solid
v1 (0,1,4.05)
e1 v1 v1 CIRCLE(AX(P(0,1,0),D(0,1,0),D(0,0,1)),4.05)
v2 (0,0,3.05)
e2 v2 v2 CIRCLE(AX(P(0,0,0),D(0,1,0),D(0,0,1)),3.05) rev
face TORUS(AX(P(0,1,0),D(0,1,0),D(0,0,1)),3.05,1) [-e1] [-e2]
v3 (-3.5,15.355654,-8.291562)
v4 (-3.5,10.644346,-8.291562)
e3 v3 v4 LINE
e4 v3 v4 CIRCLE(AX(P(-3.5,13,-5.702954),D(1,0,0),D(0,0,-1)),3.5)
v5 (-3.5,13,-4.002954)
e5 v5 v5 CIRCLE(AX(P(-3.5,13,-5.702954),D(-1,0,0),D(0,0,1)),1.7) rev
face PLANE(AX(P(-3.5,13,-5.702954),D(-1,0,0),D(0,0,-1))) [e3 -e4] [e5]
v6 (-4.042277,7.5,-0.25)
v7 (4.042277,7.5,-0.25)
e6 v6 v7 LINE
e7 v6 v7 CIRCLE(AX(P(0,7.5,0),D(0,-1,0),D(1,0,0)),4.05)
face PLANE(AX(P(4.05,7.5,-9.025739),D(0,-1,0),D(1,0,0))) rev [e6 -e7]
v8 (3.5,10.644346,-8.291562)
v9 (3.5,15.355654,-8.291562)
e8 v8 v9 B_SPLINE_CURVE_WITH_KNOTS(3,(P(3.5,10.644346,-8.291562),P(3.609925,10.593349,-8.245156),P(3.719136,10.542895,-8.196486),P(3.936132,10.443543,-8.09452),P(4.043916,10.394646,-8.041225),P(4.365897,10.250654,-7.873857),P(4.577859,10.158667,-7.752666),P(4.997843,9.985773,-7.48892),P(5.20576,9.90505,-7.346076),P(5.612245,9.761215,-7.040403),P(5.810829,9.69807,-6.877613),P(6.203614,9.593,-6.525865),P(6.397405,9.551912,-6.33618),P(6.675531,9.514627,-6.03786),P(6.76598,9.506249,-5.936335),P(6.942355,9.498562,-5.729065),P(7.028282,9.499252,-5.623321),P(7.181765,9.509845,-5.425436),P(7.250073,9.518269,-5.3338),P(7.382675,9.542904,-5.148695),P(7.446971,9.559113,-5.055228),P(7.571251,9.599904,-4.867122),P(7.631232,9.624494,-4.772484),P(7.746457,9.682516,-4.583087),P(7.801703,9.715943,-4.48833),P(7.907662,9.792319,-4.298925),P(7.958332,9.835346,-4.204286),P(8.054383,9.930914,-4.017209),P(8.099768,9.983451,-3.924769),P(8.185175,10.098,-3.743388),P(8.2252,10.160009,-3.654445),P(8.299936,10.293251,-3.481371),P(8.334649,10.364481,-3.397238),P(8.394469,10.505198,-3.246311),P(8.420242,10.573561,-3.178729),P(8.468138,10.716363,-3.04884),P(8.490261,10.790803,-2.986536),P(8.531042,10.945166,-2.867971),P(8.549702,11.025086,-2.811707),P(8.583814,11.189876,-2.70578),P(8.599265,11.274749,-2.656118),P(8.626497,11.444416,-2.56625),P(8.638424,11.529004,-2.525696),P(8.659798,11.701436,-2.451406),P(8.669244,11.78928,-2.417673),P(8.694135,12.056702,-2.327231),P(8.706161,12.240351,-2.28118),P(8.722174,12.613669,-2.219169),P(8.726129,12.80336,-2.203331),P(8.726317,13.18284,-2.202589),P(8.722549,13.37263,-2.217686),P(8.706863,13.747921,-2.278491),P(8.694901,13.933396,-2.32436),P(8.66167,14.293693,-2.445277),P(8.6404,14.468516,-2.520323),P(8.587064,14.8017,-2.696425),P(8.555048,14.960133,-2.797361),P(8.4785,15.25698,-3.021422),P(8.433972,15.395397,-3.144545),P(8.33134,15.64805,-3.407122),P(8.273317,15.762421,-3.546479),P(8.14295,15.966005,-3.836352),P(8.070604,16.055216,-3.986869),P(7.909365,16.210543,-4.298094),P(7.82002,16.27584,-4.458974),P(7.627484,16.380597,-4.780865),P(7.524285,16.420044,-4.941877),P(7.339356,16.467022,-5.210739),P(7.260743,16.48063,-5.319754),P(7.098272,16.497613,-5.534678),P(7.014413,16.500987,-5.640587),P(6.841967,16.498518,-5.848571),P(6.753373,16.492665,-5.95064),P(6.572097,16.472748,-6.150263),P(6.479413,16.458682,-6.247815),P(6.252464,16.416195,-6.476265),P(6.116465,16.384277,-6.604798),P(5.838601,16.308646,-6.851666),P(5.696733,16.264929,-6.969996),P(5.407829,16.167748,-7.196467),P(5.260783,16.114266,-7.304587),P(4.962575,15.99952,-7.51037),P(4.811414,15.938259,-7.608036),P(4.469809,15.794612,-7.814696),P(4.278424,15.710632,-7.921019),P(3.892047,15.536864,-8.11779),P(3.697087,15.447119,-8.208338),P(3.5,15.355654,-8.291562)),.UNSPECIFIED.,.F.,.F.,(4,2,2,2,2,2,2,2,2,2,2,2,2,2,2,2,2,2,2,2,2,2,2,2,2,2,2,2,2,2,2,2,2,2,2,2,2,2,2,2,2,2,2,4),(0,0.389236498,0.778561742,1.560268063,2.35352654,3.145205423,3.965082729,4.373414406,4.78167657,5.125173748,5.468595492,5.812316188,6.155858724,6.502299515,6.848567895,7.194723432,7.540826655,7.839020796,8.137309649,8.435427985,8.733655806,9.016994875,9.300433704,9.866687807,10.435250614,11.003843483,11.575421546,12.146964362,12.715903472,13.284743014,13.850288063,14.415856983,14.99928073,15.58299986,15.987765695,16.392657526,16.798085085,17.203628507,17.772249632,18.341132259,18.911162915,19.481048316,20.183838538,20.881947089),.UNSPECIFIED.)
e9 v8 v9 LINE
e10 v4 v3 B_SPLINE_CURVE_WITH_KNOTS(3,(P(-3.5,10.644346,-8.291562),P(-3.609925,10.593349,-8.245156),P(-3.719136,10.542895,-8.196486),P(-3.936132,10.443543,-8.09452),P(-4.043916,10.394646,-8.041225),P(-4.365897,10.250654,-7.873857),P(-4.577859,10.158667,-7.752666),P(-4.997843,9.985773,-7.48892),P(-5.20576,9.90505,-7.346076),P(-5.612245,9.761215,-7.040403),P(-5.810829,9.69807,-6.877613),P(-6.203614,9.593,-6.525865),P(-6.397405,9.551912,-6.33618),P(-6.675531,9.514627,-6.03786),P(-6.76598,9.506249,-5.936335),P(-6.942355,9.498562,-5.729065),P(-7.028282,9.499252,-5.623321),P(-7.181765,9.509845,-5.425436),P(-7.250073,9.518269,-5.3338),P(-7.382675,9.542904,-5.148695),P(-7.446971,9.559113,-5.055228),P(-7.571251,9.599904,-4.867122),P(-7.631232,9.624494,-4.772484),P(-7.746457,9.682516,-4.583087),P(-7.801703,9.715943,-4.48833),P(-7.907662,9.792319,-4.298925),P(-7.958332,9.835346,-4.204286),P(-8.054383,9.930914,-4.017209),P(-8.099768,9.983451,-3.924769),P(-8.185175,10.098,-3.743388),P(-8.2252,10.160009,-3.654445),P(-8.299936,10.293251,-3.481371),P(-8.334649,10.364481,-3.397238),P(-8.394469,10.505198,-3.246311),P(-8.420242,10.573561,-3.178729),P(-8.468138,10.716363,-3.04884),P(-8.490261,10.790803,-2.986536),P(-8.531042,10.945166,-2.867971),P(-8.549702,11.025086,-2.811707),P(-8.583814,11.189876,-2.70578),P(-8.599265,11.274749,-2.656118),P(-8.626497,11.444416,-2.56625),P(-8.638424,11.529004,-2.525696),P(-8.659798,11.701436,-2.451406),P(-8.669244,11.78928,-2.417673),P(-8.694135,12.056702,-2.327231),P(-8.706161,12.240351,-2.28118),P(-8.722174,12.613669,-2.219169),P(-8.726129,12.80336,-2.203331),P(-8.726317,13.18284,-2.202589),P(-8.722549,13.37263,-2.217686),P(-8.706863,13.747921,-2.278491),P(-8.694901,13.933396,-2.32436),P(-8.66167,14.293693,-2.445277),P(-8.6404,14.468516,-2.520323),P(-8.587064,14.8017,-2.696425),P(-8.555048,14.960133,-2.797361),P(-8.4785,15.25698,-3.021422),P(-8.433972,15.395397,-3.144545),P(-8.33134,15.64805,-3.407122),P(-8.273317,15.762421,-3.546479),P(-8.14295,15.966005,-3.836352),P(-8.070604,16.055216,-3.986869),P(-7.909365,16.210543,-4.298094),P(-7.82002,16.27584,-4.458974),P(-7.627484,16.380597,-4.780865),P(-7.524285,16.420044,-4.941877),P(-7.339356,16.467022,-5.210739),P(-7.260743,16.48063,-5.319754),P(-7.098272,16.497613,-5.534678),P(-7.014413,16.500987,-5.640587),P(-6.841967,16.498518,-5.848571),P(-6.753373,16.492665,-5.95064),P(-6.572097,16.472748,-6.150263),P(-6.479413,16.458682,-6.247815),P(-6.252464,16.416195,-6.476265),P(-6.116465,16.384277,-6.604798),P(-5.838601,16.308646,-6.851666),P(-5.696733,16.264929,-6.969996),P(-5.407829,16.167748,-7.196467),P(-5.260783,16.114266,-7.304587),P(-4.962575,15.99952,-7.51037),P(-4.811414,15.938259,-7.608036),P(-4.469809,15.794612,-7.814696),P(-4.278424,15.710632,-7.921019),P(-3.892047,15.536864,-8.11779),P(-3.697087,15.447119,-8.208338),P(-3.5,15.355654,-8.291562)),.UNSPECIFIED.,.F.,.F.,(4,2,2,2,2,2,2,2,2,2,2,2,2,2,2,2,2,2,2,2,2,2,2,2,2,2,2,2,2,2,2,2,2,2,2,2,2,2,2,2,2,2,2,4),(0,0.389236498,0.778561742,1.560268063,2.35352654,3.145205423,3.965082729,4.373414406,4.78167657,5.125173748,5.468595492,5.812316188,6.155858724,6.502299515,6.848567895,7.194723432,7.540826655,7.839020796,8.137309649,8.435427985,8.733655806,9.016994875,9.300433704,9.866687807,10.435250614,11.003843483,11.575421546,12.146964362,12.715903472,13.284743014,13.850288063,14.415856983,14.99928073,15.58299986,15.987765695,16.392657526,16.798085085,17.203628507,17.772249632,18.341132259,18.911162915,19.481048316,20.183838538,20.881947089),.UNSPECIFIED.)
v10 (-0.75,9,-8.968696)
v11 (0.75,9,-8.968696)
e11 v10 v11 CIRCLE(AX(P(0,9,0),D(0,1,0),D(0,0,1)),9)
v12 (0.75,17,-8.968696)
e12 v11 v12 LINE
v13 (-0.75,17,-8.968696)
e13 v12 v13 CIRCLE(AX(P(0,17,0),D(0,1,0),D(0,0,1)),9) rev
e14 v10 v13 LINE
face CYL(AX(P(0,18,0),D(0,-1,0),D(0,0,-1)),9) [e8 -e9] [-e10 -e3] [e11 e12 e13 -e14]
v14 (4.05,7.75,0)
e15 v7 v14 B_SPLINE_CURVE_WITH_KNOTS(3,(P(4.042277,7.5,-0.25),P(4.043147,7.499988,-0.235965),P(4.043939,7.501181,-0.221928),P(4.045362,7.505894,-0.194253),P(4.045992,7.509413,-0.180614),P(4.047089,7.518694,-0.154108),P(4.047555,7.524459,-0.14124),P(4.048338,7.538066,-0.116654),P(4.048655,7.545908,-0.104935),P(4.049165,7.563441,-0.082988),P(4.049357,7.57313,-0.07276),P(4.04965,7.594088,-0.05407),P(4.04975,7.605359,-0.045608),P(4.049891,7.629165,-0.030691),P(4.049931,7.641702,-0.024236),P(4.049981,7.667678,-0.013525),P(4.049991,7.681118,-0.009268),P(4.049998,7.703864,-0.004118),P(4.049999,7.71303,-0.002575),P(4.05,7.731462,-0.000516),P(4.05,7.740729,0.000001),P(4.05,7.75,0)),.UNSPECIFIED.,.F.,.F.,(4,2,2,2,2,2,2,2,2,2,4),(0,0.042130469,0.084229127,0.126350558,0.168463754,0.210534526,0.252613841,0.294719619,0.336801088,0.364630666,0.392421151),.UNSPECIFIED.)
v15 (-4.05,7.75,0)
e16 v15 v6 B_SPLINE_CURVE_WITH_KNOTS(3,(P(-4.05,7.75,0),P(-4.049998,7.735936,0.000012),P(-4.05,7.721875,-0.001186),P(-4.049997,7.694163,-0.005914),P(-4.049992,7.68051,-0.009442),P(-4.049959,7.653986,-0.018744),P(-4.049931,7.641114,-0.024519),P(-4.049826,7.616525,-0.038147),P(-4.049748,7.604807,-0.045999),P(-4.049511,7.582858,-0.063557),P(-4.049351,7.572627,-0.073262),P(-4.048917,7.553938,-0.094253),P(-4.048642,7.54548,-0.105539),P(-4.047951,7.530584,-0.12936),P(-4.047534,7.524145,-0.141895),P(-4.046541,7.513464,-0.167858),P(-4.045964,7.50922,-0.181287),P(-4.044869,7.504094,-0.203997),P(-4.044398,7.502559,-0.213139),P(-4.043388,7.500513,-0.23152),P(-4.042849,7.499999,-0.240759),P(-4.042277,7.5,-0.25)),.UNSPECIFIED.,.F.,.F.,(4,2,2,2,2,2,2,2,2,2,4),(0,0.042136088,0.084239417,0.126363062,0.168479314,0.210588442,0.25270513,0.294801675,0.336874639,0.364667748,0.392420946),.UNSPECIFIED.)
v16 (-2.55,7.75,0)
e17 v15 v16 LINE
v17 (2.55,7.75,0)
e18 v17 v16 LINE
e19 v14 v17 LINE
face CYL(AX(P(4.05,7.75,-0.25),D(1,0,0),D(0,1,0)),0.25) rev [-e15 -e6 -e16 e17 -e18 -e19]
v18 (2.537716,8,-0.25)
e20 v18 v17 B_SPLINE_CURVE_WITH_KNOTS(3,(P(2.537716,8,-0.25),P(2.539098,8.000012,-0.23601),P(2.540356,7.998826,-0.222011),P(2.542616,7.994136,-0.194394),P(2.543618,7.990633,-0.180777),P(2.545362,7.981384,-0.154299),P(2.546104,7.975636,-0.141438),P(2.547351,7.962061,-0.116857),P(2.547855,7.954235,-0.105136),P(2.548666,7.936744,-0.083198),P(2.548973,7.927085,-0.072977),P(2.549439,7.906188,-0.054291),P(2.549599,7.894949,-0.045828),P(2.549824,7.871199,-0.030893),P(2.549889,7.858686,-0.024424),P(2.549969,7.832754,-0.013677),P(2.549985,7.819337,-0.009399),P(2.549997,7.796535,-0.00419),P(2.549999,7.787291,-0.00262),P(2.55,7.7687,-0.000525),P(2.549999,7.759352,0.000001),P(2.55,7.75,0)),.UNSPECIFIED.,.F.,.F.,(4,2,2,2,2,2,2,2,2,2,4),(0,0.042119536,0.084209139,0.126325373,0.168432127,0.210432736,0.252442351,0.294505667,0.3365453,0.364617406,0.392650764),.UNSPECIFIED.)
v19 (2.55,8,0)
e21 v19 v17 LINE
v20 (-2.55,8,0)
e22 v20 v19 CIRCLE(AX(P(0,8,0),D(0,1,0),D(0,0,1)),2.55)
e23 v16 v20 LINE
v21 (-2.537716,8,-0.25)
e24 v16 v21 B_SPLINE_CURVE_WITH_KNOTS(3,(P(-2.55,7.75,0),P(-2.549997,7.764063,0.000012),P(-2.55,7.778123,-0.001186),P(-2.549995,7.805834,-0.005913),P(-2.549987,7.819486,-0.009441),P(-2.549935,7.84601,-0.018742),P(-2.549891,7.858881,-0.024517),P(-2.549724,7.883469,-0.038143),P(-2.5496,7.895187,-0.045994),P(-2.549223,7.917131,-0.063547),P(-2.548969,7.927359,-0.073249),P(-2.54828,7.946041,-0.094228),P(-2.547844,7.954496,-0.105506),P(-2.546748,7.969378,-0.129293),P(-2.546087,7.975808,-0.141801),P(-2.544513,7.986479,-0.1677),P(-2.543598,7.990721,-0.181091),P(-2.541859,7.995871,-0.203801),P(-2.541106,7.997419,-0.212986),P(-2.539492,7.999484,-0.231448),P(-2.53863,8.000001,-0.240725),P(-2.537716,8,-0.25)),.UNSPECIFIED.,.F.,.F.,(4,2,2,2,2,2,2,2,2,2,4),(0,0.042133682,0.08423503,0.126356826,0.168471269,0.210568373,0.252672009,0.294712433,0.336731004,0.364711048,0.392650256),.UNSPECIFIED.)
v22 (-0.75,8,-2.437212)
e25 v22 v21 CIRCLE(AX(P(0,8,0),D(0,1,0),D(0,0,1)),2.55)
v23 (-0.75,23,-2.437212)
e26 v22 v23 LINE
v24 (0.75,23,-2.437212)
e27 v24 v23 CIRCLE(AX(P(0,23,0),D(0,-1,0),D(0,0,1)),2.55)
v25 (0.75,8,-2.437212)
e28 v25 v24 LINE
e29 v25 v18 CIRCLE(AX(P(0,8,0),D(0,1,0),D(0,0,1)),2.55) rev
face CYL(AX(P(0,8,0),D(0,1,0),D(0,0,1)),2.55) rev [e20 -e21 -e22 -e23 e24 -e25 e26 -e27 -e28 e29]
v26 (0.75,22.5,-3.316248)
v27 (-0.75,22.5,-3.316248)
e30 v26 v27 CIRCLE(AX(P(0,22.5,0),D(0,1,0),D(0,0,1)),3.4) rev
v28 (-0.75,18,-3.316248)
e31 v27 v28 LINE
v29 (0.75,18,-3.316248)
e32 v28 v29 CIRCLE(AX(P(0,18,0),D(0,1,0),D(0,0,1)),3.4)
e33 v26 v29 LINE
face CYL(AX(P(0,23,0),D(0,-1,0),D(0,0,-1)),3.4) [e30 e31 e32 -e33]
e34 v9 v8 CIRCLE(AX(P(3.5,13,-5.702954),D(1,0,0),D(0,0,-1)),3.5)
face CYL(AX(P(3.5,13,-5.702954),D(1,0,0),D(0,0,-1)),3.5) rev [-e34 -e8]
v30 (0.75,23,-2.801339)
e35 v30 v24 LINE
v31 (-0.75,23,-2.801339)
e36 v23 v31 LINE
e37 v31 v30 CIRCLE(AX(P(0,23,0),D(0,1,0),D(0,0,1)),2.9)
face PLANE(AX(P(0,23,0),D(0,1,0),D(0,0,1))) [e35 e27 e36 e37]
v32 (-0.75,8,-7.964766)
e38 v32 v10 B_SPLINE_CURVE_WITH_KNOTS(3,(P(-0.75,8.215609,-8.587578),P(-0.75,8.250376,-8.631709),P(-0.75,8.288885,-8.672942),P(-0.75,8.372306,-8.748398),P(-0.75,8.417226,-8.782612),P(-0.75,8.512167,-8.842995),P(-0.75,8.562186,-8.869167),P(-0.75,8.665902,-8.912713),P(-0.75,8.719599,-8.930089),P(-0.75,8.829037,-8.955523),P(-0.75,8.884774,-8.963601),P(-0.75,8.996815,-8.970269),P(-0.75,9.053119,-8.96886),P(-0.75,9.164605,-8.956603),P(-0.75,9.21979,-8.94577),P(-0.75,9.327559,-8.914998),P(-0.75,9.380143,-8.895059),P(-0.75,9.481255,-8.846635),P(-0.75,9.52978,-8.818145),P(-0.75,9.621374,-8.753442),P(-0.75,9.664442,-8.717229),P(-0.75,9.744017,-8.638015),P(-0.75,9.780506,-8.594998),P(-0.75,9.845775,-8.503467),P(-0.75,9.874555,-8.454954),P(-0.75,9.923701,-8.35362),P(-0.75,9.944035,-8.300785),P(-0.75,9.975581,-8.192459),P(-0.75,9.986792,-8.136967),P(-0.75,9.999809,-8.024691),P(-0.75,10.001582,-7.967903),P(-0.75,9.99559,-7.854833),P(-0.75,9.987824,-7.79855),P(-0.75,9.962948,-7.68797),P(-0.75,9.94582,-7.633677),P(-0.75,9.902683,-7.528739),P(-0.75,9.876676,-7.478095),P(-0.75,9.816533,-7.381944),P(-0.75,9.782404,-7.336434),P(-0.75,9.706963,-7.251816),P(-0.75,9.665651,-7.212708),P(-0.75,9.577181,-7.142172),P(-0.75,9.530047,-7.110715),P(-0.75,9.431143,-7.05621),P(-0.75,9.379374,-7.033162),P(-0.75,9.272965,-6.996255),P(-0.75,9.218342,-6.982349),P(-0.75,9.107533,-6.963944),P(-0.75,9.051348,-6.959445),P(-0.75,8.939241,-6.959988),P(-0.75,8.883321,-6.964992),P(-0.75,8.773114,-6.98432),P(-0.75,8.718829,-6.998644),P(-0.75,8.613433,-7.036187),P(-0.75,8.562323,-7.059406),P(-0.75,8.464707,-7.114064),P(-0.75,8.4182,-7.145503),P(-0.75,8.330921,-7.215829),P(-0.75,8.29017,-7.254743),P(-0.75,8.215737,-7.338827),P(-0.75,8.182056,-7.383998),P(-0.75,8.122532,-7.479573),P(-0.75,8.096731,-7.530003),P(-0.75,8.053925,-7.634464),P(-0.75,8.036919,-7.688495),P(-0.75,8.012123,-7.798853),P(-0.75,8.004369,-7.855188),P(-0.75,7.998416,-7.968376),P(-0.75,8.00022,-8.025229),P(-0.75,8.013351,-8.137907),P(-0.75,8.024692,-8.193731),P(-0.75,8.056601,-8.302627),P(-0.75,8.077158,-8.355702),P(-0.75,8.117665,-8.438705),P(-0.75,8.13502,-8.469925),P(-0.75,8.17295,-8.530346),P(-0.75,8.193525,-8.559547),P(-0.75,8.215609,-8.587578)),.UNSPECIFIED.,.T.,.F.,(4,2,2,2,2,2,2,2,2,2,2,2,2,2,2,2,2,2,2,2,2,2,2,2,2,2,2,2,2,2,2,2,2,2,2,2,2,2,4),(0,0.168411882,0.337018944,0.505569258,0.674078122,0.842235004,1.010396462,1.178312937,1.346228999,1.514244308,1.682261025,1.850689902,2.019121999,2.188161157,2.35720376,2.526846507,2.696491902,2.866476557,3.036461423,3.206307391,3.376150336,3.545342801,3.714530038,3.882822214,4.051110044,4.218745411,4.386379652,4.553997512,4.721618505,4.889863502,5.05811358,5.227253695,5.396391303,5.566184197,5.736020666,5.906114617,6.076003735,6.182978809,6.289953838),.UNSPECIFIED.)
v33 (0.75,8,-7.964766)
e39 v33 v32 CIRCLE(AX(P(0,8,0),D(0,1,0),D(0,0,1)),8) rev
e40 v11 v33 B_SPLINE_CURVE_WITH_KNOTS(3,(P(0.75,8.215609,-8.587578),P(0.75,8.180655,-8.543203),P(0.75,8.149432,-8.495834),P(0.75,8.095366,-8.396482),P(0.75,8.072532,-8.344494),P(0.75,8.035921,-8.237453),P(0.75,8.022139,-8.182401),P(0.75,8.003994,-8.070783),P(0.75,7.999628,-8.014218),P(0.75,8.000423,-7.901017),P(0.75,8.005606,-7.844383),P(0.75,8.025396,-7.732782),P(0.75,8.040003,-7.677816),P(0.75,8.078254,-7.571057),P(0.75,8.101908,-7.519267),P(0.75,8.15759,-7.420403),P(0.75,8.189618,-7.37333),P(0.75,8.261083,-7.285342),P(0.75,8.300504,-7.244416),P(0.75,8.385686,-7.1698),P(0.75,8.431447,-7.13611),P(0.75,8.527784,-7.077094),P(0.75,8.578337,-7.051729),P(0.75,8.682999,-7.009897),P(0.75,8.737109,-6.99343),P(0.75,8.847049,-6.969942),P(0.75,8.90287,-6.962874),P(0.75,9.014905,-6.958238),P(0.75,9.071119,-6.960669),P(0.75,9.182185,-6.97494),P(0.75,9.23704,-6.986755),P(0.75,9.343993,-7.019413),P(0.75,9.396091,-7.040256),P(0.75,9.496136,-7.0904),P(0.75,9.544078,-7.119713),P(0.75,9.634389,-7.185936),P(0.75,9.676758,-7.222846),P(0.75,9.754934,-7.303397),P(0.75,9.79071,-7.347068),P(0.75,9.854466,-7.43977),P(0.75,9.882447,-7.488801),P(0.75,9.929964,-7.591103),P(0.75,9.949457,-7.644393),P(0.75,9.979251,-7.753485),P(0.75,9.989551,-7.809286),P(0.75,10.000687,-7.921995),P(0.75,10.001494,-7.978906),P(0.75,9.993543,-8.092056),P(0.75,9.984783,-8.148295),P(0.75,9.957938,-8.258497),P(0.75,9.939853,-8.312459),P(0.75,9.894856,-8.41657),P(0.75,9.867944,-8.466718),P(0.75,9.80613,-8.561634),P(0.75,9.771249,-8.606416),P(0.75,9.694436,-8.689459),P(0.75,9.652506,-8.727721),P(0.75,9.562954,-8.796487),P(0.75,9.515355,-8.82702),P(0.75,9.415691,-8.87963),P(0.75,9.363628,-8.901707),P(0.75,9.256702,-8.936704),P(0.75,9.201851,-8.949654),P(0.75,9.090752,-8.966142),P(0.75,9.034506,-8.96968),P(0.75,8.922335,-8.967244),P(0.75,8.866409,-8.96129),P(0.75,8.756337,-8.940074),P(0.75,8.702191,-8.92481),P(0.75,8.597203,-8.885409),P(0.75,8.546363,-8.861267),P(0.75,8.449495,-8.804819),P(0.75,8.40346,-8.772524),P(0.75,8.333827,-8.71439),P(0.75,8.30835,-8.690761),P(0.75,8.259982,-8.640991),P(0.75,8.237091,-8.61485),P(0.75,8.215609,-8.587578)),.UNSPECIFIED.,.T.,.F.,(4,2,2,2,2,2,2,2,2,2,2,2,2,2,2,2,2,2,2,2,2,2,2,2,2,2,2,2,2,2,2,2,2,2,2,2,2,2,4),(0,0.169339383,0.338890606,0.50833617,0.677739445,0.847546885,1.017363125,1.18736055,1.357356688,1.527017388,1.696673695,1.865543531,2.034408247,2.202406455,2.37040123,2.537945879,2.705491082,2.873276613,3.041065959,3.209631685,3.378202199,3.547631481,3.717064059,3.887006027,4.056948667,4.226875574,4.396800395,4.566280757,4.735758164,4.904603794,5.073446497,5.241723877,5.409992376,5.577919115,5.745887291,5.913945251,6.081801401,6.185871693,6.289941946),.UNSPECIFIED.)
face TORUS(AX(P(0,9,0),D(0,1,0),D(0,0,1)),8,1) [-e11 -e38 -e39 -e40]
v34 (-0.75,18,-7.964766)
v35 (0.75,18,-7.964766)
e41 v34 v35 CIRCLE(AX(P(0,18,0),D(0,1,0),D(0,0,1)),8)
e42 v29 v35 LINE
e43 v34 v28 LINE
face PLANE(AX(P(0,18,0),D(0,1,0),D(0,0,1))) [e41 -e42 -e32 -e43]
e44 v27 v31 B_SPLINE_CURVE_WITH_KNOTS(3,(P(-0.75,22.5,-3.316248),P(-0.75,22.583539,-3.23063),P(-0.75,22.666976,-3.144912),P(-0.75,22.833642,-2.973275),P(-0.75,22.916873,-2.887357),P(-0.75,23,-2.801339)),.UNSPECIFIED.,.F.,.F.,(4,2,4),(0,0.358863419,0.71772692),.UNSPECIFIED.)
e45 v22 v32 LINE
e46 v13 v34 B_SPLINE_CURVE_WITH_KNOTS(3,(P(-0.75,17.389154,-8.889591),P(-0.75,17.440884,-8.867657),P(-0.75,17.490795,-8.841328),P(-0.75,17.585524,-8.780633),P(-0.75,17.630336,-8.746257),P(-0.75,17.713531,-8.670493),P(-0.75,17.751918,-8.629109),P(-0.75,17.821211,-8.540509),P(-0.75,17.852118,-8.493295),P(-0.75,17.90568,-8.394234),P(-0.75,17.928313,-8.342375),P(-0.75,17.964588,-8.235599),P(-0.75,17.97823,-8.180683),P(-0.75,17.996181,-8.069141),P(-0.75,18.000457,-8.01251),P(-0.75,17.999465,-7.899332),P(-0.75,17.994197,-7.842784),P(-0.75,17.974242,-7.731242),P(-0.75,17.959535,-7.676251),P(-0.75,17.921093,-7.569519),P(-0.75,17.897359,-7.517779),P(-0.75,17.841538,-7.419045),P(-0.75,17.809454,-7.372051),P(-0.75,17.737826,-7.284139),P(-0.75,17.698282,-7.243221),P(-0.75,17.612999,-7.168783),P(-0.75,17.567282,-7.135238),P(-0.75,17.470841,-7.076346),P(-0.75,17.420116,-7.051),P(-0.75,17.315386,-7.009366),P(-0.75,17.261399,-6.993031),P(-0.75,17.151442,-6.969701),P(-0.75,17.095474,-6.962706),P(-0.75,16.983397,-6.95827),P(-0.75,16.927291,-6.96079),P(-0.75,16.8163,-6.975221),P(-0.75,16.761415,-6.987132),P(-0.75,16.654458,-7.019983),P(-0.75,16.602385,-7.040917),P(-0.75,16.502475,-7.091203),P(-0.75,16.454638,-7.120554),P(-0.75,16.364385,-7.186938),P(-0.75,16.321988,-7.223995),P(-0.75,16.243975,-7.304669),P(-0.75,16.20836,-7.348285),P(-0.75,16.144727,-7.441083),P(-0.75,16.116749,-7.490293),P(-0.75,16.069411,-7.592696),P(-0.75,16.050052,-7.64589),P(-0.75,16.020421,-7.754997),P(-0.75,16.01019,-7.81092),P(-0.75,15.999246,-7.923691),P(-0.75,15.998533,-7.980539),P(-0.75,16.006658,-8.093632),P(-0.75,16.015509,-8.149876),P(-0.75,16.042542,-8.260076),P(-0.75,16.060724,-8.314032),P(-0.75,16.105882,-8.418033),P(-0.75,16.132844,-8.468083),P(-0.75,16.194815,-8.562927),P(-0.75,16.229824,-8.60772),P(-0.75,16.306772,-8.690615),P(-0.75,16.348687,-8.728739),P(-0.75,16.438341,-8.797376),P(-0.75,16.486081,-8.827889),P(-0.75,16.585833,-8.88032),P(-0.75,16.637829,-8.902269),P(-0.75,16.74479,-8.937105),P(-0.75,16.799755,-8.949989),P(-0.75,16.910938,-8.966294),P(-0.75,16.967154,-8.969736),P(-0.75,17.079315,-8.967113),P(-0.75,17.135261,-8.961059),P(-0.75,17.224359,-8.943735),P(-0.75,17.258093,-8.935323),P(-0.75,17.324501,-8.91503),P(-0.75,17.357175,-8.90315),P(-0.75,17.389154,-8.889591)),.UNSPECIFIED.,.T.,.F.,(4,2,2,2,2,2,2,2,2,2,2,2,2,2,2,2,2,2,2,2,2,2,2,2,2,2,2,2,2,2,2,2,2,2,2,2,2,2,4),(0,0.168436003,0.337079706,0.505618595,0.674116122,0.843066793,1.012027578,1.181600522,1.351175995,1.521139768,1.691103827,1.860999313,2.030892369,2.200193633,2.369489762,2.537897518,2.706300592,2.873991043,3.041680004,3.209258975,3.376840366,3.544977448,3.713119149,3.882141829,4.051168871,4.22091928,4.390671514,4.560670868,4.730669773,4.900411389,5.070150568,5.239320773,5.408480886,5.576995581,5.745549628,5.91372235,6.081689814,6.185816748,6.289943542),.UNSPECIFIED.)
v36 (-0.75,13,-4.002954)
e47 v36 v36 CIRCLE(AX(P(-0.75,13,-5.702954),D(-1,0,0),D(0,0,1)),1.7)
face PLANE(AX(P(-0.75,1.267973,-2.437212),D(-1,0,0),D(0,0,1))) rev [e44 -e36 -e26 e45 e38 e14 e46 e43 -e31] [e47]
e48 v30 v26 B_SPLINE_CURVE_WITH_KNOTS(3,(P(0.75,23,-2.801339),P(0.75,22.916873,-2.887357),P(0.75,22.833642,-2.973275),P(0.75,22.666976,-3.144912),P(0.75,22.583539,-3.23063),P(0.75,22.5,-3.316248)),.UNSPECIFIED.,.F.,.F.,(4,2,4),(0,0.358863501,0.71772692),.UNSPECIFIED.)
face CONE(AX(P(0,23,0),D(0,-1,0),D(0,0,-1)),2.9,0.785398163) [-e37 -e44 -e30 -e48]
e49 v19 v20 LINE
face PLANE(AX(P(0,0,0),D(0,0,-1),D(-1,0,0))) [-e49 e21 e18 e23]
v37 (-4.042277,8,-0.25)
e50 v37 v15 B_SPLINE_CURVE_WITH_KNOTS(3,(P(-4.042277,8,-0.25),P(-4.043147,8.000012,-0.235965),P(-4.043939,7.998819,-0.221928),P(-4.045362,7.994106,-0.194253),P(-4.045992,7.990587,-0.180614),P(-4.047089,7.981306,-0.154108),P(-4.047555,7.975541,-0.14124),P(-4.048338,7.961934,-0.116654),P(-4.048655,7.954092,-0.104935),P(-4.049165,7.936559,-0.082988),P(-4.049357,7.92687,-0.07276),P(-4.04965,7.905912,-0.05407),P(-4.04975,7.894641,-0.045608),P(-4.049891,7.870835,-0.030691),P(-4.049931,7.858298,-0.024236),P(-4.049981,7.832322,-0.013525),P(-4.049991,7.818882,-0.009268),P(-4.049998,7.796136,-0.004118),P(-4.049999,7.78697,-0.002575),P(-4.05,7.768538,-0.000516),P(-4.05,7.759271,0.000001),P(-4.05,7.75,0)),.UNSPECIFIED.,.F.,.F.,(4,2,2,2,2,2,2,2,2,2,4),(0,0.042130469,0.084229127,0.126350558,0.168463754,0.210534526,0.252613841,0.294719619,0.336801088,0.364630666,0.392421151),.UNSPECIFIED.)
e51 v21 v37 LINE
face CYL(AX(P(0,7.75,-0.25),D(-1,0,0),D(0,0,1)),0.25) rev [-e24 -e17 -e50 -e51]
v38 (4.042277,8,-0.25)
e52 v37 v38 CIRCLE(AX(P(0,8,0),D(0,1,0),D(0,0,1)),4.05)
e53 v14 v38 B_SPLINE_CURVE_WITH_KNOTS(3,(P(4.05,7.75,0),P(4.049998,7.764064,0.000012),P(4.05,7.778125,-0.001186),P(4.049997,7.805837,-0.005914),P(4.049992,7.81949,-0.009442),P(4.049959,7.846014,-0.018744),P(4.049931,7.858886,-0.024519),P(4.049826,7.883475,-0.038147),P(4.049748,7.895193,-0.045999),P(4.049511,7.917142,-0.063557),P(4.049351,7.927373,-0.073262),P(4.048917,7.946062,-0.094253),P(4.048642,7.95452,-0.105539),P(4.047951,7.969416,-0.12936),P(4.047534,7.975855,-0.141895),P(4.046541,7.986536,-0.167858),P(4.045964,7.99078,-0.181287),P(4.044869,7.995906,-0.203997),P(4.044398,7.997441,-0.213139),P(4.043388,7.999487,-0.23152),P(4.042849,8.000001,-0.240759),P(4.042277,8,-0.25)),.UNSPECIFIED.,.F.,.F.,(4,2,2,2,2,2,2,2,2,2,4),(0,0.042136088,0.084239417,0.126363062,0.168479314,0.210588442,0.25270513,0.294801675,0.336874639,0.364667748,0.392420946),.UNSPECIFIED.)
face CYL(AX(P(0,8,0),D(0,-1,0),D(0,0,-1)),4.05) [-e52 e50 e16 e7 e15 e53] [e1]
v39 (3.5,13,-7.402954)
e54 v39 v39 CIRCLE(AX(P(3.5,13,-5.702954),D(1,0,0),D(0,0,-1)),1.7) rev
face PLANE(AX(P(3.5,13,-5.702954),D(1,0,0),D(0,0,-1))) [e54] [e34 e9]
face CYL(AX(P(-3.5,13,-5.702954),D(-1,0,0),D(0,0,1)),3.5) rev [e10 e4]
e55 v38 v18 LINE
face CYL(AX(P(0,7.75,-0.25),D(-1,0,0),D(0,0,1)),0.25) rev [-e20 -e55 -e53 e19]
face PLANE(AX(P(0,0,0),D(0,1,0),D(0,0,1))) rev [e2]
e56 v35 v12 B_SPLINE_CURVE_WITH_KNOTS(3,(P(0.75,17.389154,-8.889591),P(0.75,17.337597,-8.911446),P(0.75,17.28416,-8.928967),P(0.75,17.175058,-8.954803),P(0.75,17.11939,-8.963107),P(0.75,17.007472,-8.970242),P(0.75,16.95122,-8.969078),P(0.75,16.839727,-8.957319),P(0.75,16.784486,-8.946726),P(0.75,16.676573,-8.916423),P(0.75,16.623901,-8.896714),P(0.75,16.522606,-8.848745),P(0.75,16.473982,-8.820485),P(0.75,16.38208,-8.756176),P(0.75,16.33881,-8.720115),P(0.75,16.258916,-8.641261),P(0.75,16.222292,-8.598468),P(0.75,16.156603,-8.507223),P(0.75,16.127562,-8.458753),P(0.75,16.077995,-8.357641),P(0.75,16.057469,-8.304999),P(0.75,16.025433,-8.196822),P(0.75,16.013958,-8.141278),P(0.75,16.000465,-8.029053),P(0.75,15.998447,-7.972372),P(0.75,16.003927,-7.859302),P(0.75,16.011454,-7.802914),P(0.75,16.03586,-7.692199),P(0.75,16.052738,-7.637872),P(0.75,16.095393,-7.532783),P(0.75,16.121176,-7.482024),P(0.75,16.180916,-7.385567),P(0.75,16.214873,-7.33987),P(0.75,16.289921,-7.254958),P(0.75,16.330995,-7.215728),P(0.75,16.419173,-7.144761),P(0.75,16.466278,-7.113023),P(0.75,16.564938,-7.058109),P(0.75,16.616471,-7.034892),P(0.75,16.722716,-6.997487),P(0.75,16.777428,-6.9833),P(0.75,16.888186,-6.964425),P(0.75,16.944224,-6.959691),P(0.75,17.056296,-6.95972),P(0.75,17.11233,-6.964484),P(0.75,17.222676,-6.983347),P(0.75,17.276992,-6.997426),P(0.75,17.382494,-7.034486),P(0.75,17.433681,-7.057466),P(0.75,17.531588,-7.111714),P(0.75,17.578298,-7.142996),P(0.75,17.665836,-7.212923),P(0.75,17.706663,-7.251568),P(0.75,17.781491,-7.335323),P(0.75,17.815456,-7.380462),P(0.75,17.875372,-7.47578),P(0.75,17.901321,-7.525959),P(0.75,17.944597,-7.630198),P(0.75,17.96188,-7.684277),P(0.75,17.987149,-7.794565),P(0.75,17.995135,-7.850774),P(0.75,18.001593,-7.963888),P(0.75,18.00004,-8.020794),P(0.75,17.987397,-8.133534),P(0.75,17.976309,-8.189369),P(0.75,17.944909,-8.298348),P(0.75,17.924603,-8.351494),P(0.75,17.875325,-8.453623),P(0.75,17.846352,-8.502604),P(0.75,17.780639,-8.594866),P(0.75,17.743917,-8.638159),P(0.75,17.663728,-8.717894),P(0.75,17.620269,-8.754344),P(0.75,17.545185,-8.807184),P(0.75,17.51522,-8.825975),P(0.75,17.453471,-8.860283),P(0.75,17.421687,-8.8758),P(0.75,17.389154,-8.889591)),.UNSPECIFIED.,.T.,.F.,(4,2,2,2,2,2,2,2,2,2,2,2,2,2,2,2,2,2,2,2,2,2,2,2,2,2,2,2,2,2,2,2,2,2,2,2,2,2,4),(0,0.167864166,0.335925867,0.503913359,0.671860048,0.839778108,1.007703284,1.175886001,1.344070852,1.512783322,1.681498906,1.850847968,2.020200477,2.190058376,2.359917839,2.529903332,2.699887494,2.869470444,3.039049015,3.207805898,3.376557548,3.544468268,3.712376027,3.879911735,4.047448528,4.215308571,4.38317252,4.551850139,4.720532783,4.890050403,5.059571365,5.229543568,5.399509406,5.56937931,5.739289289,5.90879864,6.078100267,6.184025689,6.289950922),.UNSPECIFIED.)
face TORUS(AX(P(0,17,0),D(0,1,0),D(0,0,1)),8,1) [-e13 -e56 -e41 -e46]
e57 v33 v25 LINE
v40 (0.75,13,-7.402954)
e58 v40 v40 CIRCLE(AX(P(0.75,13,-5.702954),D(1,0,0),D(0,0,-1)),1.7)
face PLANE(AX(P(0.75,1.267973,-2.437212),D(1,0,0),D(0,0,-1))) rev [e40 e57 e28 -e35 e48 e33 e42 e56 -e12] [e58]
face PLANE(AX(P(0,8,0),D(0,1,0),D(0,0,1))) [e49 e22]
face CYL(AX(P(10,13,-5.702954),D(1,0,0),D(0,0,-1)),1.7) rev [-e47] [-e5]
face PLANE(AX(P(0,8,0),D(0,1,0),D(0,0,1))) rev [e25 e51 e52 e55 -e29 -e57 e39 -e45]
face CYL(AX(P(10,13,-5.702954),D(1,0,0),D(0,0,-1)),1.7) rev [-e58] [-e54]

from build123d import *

# Parameters (mm, degrees)
SKETCH1_R            = 4.05
BOSS_EXTRUDE1_DEPTH  = 8
SKETCH2_R            = 9
BOSS_EXTRUDE2_DEPTH  = 10
FILLET1_R            = 1
SKETCH3_R            = 2.55
CUT_EXTRUDE1_DEPTH   = 10
CUT_EXTRUDE2_REACH   = 24.045
M3_CLEARANCE_HOLE1_D = 3.4
SKETCH28_R           = 3.5
CUT_EXTRUDE3_DEPTH   = 6.5
SKETCH29_W           = 8.1
SKETCH29_H           = 0.5
CUT_EXTRUDE7_DEPTH   = 23.045407848
FILLET2_R            = 0.25
BOSS_EXTRUDE3_START  = 5
BOSS_EXTRUDE3_DEPTH  = 5
CHAMFER1_SIZE        = 0.5


with BuildPart() as part:
    # Sketch1 → Boss-Extrude1 (new body)
    with BuildSketch(Plane(origin=(0, 0, 0), x_dir=(1, 0, 0), z_dir=(0, 1, 0))):
        with Locations(Location((0, 0, 0), (0, 0, 270))):
            Circle(SKETCH1_R)
    extrude(amount=BOSS_EXTRUDE1_DEPTH)

    # Sketch2 → Boss-Extrude2 (add)
    with BuildSketch(Plane(origin=(0, 8, 0), x_dir=(1, 0, 0), z_dir=(0, 1, 0))):
        with Locations(Location((0, 0, 0), (0, 0, 270))):
            Circle(SKETCH2_R)
    extrude(amount=BOSS_EXTRUDE2_DEPTH)

    # Fillet1
    fillet1_edges = [part.edges().sort_by_distance(p)[0] for p in [
        (0, 0, -4.05),
        (0, 8, -9),
        (0, 18, -9),
    ]]
    fillet(fillet1_edges, radius=FILLET1_R)

    # Sketch3 → Cut-Extrude1 (cut)
    with BuildSketch(Plane(origin=(0, 18, 0), x_dir=(1, 0, 0), z_dir=(0, 1, 0))):
        with Locations(Location((0, 0, 0), (0, 0, 270))):
            Circle(SKETCH3_R)
    extrude(amount=-CUT_EXTRUDE1_DEPTH, mode=Mode.SUBTRACT)

    # Cut-Extrude2: up to this face of the body (flat: up to its plane)
    cut_extrude2_end = Plane(part.part.faces().sort_by_distance((0, 8, -7.77372583))[0])
    # Sketch20 → Cut-Extrude2 (cut, up to the picked face)
    with BuildSketch(Plane(origin=(0, 18, 0), x_dir=(1, 0, 0), z_dir=(0, 1, 0)), mode=Mode.PRIVATE) as cut_extrude2_sk1:
        with BuildLine():
            Line((-0.75, 2.437211521), (0.75, 2.437211521))
            Line((0.75, 2.437211521), (0.75, 8.968695557))
            ThreePointArc((0.75, 8.968695557), (0, 9), (-0.75, 8.968695557))
            Line((-0.75, 8.968695557), (-0.75, 2.437211521))
        make_face()
    cut_extrude2_tool1 = split(extrude(cut_extrude2_sk1.sketch, amount=-CUT_EXTRUDE2_REACH, mode=Mode.PRIVATE), bisect_by=cut_extrude2_end, keep=Keep.BOTH, mode=Mode.PRIVATE)
    add(cut_extrude2_tool1.solids().sort_by(Axis((0, 18, -5.713399), (0, -1, 0)))[0], mode=Mode.SUBTRACT)

    # M3 Clearance Hole1 (through all)
    with Locations(Plane(origin=(10, 0, 0), x_dir=(0, 0, -1), z_dir=(1, 0, 0))):
        with Locations((5.702953539, 13)):
            Hole(M3_CLEARANCE_HOLE1_D / 2)

    # Sketch28 → Cut-Extrude3 (cut)
    with BuildSketch(Plane(origin=(10, 0, 0), x_dir=(0, 0, -1), z_dir=(1, 0, 0))):
        with Locations((5.702953539, 13)):
            Circle(SKETCH28_R)
    cut_extrude3 = extrude(amount=-CUT_EXTRUDE3_DEPTH, mode=Mode.SUBTRACT)

    # Mirror1: Cut-Extrude3 across plane
    add(cut_extrude3.mirror(Plane(origin=(0, 0, 0), x_dir=(0, 0, 1), z_dir=(1, 0, 0))), mode=Mode.SUBTRACT)

    # Sketch29 → Cut-Extrude7 (cut, through all)
    with BuildSketch(Plane.XY):
        with Locations((0, 7.75)):
            Rectangle(SKETCH29_W, SKETCH29_H)
    extrude(amount=-CUT_EXTRUDE7_DEPTH, mode=Mode.SUBTRACT)

    # Fillet2
    fillet2_edges = [part.edges().sort_by_distance(p)[0] for p in [
        (-3.3, 8, 0),
        (3.3, 8, 0),
        (0, 7.5, 0),
    ]]
    fillet(fillet2_edges, radius=FILLET2_R - 0.0001)  # a hair under: the kernel refuses the full size

    # Sketch30 → Boss-Extrude3 (add)
    with BuildSketch(Plane(origin=(0, 18, 0), x_dir=(1, 0, 0), z_dir=(0, 1, 0)).offset(BOSS_EXTRUDE3_START)):
        with BuildLine():
            Line((-0.75, 3.31624788), (-0.75, 2.437211521))
            ThreePointArc((-0.75, 2.437211521), (0, -2.55), (0.75, 2.437211521))
            Line((0.75, 2.437211521), (0.75, 3.31624788))
            ThreePointArc((0.75, 3.31624788), (0, -3.4), (-0.75, 3.31624788))
        make_face()
    extrude(amount=-BOSS_EXTRUDE3_DEPTH)

    # Chamfer1
    chamfer1_edges = [part.edges().sort_by_distance(p)[0] for p in [
        (0, 23, 3.4),
    ]]
    chamfer(chamfer1_edges, length=CHAMFER1_SIZE)


solid = part.part
